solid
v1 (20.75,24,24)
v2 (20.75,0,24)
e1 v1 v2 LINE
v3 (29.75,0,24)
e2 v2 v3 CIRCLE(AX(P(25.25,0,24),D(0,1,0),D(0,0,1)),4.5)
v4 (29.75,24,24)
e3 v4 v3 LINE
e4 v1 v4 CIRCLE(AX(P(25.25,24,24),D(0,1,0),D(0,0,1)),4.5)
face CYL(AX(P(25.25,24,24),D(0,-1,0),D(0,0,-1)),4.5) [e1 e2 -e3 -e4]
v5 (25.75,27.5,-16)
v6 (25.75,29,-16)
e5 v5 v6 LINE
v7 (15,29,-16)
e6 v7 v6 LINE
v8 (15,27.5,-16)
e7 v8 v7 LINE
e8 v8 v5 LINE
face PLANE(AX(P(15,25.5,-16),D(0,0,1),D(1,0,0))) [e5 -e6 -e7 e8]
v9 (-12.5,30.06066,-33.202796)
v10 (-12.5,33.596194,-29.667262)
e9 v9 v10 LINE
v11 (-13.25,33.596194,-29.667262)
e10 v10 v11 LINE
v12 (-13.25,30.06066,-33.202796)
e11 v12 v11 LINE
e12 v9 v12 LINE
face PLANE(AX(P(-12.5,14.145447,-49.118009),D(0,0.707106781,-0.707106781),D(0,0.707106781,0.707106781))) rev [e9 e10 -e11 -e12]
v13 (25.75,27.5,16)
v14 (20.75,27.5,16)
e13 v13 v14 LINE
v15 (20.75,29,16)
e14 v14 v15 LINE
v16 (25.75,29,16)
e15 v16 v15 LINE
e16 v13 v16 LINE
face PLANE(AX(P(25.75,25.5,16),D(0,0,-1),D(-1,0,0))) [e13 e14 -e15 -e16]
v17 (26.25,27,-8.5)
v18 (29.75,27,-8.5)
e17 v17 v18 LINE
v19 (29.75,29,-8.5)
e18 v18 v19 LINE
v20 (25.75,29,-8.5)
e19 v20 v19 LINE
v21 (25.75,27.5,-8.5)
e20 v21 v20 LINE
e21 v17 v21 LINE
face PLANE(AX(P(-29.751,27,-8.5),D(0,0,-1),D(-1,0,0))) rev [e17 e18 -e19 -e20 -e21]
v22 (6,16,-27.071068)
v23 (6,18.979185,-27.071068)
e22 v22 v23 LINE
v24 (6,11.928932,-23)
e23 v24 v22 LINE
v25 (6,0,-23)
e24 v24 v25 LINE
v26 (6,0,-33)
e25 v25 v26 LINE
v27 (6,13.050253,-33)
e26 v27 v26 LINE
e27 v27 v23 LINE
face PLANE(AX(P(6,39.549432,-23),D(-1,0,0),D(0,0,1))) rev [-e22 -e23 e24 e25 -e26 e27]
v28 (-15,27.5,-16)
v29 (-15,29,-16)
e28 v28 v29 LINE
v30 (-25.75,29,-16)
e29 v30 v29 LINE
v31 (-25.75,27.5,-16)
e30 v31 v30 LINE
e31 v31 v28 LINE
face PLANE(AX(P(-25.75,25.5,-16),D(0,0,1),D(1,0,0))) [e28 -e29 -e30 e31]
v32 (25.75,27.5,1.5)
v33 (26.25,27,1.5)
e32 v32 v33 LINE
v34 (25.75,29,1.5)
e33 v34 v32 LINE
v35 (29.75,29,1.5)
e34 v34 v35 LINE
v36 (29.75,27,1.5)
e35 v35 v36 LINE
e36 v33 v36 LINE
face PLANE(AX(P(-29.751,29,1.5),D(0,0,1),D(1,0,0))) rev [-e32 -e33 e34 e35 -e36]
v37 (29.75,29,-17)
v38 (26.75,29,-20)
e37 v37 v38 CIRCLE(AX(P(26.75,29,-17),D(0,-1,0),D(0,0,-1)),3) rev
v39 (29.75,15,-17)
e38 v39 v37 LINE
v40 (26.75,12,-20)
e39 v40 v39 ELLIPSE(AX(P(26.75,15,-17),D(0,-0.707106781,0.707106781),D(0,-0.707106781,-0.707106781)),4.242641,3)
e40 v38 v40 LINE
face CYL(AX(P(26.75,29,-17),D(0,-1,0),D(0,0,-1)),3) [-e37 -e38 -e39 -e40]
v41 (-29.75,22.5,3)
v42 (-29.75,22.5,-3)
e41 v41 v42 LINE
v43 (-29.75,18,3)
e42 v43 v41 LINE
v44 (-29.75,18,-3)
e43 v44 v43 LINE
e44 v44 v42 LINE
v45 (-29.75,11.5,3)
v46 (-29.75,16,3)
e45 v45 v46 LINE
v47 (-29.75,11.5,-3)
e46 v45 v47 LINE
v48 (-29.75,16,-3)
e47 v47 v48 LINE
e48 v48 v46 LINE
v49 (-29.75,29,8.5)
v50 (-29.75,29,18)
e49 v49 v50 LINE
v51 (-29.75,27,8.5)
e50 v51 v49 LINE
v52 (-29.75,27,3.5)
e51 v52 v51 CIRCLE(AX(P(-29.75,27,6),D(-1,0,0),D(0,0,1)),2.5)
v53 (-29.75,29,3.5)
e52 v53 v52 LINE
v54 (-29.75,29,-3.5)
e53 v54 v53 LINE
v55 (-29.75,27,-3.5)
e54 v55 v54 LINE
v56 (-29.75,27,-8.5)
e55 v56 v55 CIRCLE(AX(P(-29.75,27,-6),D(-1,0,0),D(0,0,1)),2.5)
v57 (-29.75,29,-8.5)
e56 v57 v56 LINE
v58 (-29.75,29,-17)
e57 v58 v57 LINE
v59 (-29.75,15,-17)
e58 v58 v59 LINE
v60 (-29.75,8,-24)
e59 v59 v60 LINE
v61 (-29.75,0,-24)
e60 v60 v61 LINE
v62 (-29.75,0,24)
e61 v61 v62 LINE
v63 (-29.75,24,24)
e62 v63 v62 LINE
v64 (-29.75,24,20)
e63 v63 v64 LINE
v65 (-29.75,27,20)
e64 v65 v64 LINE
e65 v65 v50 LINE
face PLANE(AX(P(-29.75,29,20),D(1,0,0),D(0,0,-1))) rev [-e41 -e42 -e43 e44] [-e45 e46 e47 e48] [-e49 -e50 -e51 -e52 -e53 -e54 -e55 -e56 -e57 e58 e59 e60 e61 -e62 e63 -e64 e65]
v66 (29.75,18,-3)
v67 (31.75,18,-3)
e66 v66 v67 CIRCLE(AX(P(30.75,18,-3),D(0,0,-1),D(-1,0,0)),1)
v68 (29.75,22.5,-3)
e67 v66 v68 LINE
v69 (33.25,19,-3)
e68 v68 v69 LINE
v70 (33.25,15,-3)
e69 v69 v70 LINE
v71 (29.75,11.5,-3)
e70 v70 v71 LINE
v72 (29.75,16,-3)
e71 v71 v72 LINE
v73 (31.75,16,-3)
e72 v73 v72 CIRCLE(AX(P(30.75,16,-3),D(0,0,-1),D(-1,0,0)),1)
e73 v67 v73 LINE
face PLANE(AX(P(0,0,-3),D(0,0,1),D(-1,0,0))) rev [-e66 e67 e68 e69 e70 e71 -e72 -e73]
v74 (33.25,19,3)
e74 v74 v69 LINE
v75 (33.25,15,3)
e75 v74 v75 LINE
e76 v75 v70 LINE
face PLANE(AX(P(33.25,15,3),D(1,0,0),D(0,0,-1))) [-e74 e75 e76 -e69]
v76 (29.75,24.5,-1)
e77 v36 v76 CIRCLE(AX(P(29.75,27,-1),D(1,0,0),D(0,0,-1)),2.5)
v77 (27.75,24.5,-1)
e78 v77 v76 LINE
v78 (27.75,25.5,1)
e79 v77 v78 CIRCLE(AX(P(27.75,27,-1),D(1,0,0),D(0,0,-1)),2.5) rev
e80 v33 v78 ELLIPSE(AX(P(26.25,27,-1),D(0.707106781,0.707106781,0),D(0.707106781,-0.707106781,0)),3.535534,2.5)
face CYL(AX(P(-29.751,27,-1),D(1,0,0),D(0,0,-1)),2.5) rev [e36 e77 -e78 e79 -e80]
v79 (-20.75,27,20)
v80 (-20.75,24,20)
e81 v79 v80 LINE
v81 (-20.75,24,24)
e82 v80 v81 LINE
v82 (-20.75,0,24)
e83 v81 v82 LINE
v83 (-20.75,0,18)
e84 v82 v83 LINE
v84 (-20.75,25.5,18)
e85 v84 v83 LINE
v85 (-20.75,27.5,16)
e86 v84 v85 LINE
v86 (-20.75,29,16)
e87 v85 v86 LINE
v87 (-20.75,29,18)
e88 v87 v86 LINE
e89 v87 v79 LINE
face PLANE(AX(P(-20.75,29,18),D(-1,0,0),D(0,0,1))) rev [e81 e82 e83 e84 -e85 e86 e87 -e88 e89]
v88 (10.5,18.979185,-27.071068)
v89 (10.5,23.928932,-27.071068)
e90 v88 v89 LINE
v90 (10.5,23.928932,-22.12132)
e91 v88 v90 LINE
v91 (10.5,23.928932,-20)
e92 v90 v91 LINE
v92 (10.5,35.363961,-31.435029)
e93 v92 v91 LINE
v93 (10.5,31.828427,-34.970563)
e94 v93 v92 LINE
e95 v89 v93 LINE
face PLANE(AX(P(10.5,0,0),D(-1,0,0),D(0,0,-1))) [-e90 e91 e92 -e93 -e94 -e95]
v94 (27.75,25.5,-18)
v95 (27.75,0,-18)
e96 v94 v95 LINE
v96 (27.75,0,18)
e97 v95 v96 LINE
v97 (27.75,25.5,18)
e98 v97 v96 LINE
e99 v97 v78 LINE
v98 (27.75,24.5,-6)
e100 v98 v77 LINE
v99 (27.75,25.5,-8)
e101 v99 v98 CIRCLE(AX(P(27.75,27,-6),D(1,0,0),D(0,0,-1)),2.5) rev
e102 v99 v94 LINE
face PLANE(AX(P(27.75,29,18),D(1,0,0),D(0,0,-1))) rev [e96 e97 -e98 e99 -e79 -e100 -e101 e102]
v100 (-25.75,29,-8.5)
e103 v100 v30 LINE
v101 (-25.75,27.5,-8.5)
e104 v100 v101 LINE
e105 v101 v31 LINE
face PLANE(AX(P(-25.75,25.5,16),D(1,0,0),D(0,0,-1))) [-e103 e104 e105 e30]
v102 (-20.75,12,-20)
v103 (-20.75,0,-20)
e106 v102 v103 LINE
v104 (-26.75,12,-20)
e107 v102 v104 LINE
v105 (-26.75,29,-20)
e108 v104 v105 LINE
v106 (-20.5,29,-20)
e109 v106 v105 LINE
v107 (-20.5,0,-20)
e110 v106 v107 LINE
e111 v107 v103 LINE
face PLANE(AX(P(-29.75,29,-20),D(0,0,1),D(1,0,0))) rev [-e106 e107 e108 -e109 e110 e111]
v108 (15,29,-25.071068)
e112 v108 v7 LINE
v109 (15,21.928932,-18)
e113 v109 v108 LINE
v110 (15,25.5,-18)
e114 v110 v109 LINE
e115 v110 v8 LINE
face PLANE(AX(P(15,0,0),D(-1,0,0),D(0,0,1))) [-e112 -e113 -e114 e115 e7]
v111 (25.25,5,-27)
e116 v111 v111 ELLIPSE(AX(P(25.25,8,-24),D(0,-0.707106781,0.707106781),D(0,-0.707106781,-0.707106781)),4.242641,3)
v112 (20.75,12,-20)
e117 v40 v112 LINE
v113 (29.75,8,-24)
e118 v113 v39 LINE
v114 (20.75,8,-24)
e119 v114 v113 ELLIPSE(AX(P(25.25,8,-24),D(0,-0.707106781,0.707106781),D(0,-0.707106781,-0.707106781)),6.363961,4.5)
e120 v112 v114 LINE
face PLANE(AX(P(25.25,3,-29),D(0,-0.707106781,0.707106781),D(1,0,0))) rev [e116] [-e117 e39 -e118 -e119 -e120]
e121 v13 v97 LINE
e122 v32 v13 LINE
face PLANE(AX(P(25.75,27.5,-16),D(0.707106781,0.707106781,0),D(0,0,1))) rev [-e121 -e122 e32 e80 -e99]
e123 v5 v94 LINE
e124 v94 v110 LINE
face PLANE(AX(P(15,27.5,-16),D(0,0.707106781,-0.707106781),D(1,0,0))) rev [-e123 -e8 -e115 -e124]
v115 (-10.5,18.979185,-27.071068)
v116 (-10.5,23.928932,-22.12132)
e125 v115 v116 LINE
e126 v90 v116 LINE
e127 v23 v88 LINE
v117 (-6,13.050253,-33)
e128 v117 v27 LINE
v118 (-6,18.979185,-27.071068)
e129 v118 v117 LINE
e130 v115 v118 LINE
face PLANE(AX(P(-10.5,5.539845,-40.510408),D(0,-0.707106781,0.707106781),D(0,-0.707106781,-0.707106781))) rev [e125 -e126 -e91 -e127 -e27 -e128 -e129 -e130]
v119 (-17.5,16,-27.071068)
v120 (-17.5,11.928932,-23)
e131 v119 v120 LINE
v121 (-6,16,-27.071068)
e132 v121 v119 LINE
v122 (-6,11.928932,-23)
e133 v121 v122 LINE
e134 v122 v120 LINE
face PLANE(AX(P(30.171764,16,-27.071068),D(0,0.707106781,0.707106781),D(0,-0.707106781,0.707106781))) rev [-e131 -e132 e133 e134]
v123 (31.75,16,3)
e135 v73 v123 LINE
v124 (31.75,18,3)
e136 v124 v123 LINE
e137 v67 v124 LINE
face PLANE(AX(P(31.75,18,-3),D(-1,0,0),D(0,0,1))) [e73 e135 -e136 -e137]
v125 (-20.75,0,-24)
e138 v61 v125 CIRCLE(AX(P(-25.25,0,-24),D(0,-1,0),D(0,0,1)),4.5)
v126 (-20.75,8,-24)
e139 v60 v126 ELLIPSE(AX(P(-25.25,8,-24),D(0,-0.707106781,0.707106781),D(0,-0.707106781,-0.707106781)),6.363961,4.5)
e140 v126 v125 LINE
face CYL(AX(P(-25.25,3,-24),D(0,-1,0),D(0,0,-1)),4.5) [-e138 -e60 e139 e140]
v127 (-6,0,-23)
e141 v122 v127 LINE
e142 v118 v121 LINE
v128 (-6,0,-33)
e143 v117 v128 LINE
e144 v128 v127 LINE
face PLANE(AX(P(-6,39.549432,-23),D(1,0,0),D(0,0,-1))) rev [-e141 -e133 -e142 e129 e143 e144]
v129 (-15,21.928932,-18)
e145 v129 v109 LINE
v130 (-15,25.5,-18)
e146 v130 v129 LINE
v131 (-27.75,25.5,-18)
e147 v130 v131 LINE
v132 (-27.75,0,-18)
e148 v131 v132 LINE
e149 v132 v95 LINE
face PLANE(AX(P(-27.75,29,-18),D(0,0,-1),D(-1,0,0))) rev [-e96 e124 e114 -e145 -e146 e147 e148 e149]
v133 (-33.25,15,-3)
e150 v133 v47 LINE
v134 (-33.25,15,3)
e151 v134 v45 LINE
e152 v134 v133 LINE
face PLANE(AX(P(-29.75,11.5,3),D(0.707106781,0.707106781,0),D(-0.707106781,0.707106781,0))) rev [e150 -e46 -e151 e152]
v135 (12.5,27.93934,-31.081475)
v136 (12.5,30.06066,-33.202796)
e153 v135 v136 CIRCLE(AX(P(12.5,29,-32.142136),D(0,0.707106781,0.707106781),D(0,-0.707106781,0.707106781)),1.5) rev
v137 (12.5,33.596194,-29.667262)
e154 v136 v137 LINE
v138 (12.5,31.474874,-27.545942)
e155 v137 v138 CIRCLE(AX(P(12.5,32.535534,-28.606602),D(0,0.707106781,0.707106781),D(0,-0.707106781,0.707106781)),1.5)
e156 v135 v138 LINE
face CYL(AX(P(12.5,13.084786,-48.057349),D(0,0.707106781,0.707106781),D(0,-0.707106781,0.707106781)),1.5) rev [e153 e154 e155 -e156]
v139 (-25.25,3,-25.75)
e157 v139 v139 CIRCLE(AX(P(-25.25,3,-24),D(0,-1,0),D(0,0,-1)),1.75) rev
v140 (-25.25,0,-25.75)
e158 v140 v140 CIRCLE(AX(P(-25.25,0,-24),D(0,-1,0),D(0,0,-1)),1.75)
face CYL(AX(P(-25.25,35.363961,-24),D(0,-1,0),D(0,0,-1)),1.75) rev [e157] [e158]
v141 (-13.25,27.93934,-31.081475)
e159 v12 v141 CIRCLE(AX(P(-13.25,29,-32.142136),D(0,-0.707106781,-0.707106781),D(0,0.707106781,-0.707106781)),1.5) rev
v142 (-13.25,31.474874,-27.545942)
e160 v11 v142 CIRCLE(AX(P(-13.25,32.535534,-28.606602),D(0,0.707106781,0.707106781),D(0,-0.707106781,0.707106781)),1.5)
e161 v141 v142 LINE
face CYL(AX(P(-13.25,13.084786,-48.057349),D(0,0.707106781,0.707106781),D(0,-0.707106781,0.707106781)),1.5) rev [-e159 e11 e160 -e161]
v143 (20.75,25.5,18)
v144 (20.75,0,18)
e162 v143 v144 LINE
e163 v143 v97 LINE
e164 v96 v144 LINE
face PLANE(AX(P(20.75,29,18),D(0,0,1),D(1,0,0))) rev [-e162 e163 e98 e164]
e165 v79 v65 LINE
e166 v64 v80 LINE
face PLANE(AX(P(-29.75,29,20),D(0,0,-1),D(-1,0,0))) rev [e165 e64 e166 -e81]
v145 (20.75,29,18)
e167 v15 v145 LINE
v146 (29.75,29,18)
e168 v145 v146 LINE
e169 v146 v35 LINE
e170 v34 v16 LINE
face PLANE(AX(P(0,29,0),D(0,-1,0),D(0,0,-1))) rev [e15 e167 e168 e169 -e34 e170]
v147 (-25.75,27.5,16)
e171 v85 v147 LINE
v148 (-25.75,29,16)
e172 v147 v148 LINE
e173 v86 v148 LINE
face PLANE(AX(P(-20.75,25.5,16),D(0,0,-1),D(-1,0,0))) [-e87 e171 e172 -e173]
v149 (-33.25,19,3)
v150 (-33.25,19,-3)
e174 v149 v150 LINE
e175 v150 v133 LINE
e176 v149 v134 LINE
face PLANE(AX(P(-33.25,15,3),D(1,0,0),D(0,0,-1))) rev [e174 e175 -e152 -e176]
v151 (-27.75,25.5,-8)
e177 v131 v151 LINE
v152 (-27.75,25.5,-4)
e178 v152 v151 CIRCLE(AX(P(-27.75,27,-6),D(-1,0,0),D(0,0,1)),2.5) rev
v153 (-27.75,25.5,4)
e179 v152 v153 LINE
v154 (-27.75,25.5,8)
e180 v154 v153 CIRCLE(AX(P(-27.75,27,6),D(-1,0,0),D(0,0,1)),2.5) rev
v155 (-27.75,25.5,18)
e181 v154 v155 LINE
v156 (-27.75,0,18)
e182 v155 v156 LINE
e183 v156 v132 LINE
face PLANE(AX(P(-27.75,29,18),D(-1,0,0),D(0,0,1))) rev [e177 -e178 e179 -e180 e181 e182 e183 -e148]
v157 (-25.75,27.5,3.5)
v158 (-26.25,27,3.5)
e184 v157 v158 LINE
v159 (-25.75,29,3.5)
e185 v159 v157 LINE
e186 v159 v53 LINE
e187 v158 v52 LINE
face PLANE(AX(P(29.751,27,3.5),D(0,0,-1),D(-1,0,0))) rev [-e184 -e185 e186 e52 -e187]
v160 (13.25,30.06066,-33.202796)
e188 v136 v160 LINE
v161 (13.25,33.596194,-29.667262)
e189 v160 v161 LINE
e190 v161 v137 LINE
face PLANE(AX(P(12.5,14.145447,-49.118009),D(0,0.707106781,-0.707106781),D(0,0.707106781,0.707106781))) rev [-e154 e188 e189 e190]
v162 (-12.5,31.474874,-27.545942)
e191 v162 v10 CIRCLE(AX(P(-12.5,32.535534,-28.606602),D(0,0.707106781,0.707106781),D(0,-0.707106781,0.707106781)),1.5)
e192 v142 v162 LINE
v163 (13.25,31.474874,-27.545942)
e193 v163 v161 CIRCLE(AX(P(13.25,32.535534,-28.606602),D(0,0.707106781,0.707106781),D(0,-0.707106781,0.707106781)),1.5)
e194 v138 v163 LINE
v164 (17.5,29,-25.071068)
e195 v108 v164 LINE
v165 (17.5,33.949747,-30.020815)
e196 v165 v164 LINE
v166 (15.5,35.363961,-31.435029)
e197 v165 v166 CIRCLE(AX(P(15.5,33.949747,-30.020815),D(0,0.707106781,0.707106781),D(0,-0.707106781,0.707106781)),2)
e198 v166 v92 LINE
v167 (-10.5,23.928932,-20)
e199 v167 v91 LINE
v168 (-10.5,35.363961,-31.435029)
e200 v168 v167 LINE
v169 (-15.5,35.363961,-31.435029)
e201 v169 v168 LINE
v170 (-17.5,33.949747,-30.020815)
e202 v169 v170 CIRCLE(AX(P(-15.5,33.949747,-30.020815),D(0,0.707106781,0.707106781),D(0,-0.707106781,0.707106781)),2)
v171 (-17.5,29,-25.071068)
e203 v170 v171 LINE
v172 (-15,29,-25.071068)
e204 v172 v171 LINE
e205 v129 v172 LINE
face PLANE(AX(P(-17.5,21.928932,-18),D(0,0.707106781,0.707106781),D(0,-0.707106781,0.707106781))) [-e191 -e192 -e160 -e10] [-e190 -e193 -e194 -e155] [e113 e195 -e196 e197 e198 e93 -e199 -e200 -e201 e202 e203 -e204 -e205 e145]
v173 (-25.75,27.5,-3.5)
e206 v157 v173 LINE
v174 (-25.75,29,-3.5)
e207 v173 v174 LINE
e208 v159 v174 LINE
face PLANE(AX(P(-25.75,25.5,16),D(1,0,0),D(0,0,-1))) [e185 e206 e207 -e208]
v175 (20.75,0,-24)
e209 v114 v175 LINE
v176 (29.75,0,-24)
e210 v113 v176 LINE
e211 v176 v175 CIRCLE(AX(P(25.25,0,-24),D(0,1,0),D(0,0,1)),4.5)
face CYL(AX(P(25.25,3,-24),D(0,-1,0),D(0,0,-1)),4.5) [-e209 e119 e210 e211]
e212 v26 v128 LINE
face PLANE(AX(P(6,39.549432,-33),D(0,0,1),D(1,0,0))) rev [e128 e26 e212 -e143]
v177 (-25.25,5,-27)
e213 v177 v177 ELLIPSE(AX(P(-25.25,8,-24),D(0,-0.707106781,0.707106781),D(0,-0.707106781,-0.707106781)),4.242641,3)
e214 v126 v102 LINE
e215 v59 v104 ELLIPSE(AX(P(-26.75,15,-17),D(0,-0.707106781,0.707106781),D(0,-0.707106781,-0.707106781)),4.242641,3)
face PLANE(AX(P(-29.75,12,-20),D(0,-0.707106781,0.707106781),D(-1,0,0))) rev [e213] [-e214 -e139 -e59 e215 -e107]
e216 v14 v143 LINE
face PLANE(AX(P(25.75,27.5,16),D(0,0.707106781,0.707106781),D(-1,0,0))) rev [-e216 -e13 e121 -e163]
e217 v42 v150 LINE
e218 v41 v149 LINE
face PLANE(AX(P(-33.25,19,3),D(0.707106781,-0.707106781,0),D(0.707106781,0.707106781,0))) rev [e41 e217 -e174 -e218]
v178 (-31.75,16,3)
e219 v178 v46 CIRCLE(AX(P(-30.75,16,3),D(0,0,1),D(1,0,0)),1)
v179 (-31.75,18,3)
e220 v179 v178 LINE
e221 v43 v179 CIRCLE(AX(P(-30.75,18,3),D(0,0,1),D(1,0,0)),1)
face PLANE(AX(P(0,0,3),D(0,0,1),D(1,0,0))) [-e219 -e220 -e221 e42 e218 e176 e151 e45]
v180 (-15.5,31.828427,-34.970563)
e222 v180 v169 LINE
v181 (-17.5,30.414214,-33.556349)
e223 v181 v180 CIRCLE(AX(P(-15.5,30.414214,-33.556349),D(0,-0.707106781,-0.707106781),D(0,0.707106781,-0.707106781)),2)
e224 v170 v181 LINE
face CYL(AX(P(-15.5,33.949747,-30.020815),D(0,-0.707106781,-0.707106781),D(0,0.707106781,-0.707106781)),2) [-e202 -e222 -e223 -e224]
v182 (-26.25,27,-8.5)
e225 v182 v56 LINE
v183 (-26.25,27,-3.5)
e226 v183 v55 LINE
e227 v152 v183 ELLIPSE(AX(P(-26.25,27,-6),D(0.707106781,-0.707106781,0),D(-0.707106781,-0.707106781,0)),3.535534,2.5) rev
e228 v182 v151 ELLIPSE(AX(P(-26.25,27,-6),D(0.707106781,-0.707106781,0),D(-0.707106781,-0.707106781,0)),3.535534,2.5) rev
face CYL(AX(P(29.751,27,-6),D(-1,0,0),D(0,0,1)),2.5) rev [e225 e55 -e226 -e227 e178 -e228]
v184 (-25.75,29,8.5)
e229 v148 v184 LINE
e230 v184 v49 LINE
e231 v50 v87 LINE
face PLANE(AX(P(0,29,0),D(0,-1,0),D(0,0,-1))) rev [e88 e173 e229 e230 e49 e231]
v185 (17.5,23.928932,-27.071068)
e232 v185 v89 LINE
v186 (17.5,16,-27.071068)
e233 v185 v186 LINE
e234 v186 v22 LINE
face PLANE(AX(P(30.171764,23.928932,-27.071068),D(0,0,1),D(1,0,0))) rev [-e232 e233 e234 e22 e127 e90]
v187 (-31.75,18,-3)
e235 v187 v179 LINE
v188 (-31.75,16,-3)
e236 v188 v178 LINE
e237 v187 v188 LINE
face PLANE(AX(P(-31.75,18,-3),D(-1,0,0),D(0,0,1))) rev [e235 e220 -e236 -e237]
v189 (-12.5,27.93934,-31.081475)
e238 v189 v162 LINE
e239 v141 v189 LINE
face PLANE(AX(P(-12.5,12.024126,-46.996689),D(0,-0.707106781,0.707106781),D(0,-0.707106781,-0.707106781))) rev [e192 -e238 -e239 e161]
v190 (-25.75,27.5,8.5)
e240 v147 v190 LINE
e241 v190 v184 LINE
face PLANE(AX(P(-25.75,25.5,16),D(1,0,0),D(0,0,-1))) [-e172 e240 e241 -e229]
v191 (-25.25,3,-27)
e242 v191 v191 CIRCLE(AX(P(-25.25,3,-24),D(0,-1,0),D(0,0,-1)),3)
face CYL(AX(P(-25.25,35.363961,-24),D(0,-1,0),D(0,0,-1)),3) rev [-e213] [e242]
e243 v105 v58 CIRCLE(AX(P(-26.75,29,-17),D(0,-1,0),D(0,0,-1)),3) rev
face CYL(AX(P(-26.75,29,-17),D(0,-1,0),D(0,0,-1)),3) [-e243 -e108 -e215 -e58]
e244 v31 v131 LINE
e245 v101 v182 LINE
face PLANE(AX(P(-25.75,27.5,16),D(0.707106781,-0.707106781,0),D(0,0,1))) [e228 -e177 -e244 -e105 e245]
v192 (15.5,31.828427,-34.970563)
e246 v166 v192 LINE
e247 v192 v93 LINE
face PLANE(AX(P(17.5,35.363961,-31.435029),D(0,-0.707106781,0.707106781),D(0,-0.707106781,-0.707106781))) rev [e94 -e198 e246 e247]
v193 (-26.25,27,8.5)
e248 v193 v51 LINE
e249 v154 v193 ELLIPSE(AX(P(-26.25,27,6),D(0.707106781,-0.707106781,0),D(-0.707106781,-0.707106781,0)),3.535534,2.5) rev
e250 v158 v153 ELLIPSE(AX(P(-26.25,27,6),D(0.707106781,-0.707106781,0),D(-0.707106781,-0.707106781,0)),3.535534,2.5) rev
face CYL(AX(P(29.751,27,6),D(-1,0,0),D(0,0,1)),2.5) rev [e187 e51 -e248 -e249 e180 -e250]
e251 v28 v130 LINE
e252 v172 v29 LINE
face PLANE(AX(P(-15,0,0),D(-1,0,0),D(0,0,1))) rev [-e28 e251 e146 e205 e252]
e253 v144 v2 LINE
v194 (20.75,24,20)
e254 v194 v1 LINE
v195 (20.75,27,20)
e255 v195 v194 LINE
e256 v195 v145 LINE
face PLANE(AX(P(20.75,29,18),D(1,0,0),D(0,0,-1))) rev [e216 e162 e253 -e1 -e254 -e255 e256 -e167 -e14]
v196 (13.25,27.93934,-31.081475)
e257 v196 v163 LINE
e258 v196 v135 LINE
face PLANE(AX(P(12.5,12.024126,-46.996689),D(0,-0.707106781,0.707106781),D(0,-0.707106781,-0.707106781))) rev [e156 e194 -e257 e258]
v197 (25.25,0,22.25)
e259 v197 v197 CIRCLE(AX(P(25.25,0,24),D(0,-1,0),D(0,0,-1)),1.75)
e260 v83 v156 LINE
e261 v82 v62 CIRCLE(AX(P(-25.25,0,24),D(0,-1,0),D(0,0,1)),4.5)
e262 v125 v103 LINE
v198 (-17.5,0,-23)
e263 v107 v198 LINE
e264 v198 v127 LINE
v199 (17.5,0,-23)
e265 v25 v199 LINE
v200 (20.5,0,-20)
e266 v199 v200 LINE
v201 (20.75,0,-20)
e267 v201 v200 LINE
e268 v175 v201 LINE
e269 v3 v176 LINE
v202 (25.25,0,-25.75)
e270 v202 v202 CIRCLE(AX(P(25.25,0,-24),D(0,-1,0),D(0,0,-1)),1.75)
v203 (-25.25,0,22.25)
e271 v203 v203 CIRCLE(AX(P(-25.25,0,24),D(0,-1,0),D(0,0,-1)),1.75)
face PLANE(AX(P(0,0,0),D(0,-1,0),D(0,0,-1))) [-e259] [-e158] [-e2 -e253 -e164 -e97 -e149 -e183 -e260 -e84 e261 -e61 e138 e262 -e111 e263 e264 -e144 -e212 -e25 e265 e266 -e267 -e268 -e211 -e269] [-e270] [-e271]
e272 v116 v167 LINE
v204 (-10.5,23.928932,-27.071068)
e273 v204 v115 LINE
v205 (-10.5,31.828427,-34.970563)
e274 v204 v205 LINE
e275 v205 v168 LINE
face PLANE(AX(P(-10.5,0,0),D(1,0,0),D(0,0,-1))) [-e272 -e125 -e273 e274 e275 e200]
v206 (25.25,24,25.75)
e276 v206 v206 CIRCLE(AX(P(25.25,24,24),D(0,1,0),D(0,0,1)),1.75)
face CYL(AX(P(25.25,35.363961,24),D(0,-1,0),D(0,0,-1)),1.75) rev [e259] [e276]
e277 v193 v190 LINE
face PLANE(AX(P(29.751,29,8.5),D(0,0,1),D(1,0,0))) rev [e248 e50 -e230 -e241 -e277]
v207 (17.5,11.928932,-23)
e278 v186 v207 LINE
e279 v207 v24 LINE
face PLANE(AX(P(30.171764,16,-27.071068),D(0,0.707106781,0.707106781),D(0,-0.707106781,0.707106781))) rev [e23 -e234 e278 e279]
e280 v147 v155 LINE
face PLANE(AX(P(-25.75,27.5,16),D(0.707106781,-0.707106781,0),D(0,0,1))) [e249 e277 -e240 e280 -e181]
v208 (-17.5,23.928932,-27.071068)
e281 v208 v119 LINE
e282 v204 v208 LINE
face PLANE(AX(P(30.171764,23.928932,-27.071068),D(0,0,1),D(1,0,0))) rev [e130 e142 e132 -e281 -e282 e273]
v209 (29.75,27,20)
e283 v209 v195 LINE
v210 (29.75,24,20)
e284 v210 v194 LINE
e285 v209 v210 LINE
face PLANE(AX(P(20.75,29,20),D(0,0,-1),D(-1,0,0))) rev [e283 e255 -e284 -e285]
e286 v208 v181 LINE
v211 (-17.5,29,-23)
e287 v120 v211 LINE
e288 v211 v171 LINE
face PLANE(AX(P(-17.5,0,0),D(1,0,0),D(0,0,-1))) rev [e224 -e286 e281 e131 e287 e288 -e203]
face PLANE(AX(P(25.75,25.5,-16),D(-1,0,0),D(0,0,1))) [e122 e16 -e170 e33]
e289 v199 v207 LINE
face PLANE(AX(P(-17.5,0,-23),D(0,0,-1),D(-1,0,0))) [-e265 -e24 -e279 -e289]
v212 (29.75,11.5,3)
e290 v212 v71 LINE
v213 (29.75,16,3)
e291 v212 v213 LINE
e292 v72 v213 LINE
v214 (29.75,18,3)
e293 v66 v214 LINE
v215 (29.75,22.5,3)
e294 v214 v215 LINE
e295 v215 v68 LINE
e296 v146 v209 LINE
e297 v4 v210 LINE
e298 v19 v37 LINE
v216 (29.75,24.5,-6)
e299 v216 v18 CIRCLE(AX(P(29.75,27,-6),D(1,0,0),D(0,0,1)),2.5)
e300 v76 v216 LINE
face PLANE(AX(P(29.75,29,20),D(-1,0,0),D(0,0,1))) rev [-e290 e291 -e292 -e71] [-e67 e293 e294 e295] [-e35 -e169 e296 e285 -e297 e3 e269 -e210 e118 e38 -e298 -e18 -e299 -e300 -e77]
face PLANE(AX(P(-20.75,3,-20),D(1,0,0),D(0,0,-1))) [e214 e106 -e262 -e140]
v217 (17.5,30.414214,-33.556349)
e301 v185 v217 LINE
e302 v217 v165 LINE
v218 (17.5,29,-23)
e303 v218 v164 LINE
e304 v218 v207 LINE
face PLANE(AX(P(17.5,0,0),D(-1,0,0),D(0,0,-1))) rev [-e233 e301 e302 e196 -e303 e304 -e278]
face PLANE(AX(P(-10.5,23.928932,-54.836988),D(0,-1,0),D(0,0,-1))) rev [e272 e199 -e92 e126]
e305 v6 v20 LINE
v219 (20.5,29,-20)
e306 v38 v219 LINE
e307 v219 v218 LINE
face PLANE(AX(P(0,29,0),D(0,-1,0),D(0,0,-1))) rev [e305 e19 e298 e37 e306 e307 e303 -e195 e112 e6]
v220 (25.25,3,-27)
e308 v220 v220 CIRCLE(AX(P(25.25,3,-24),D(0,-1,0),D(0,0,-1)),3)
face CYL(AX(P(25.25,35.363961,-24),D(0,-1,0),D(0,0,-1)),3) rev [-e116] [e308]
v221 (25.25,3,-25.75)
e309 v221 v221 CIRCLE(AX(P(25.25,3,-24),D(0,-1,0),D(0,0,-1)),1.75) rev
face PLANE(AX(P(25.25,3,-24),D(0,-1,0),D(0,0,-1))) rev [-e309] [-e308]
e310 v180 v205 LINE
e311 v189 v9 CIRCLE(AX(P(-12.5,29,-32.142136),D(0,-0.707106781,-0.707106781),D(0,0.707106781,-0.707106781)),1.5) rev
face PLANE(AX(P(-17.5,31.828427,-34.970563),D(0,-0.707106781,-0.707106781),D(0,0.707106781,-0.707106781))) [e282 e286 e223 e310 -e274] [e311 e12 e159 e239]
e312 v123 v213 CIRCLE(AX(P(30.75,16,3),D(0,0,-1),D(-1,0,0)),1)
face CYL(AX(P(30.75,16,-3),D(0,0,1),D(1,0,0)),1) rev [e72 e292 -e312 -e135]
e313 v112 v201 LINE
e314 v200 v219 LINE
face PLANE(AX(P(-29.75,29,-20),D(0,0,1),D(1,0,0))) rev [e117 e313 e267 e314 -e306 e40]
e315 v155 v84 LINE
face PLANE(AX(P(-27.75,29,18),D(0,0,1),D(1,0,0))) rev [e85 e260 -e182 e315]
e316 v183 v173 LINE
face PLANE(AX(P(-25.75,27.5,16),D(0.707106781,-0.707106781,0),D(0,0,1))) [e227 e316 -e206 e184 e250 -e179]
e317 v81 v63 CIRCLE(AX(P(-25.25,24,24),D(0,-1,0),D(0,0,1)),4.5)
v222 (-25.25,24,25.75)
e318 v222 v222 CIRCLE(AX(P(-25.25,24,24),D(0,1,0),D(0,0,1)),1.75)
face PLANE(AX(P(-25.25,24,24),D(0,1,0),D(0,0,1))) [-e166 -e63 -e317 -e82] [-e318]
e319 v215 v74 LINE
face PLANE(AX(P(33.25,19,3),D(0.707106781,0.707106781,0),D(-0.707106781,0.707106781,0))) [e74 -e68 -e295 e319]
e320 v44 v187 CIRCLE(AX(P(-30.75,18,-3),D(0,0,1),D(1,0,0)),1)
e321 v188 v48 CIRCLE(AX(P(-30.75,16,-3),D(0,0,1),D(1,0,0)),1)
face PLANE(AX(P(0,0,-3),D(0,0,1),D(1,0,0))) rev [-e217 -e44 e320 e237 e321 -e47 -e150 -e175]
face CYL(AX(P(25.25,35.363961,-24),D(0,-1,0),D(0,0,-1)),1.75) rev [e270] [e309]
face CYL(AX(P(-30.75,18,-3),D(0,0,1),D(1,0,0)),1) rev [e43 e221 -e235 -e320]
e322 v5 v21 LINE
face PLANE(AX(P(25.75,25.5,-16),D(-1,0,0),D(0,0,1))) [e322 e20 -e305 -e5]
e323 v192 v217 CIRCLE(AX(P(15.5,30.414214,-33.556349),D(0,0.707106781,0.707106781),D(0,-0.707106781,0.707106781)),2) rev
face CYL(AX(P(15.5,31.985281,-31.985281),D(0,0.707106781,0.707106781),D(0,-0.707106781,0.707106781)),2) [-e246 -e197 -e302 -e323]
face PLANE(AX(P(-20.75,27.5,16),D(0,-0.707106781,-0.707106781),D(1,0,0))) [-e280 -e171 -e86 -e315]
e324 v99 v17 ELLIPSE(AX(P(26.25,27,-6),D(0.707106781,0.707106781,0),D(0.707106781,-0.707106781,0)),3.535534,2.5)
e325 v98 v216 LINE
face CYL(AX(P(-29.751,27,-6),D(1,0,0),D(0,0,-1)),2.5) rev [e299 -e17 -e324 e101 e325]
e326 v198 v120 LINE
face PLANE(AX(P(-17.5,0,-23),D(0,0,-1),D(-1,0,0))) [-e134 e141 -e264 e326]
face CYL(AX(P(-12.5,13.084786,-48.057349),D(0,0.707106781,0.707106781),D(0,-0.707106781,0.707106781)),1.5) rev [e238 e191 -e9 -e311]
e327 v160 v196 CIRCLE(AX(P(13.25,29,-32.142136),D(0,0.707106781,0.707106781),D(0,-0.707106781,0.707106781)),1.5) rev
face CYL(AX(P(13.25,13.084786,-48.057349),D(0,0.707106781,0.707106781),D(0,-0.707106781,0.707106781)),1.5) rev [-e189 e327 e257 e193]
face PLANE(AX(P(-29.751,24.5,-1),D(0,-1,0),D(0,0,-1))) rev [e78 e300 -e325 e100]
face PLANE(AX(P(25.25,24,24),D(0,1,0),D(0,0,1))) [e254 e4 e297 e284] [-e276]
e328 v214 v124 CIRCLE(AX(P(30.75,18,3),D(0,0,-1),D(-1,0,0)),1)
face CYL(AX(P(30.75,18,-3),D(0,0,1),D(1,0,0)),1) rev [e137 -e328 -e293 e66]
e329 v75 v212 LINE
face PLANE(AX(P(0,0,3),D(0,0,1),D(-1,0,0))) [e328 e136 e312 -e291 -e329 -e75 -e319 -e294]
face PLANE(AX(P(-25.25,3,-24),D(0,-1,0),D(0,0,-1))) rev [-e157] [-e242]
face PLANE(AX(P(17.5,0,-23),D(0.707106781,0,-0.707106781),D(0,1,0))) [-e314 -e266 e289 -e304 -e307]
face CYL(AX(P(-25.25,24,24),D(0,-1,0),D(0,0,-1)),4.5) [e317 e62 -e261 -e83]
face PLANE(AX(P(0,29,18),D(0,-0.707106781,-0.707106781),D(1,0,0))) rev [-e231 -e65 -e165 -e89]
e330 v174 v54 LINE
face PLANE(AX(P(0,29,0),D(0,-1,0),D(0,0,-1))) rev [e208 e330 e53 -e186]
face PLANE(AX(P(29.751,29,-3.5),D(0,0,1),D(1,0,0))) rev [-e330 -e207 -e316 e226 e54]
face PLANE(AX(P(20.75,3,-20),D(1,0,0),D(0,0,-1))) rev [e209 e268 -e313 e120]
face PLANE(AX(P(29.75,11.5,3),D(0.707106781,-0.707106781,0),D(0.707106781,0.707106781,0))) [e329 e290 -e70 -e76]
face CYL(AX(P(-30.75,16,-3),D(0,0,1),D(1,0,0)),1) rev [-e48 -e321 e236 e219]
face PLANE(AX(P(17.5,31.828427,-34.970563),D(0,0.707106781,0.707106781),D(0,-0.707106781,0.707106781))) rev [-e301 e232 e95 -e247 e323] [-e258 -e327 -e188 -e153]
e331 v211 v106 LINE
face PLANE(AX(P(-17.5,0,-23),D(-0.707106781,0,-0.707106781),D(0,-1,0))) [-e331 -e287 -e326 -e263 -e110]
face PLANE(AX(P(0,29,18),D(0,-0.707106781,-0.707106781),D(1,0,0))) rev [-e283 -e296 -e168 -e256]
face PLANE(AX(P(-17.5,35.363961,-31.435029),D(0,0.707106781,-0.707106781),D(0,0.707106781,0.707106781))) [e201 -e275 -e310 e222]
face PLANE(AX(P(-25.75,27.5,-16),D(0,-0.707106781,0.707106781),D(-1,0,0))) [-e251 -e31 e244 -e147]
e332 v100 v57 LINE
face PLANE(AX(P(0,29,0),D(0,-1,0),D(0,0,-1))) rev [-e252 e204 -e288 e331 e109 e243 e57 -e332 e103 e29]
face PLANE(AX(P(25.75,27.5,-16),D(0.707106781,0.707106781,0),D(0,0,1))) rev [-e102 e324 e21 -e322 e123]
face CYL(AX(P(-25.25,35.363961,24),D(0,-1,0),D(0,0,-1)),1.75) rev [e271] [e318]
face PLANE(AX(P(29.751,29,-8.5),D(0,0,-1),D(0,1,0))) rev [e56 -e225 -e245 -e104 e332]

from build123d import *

# Parameters (mm, degrees)
BOSS_EXTRUDE1_DEPTH              = 29
BOSS_EXTRUDE2_START              = -10.5
BOSS_EXTRUDE2_DEPTH              = 7
CUT_EXTRUDE1_DEPTH               = 15
CUT_EXTRUDE2_REACH               = 60.007
BOSS_EXTRUDE4_DEPTH              = 2.5
SKETCH6_W                        = 21
SKETCH6_H                        = 23.928932188
BOSS_EXTRUDE3_DEPTH              = 3
CHAMFER1_SIZE                    = 3
FILLET3_R                        = 2
BOSS_EXTRUDE5_DEPTH              = 3
BOSS_EXTRUDE6_DEPTH              = 24
CHAMFER4_START                   = 3
CHAMFER4_DEPTH                   = 0.53256
CHAMFER4_START_2                 = 3.53256
CHAMFER4_2_DEPTH                 = 8.46744
CHAMFER4_START_3                 = 22.627416998
CHAMFER4_3_DEPTH                 = 7.372583002
SKETCH9_R                        = 1.75
CUT_EXTRUDE4_DEPTH               = 58.953537465
CUT_EXTRUDE5_START               = -3
SKETCH10_R                       = 3
CUT_EXTRUDE5_DEPTH               = 55.953537465
BOSS_EXTRUDE7_DEPTH              = 3.5
CHAMFER5_SIZE                    = 2
FILLET4_R                        = 3
CUT_EXTRUDE6_REACH               = 79.549
CUT_EXTRUDE7_REACH               = 79.549
BOSS_EXTRUDE8_DEPTH              = 3
CUT_EXTRUDE8_DEPTH               = 3
SKETCH17_W                       = 12
SKETCH17_H                       = 10
BOSS_EXTRUDE9_DEPTH              = 23.928932188
BOSS_EXTRUDE10_REACH             = 61.826
BOSS_EXTRUDE10_DIRECTION_2_REACH = 61.826
SKETCH19_W                       = 21
SKETCH19_H                       = 14.671572875
CUT_EXTRUDE9_DEPTH               = 60.877250418
CHAMFER6_SIZE                    = 2


with BuildPart() as part:
    # Sketch1 → Boss-Extrude1 (new body)
    with BuildSketch(Plane(origin=(0, 0, 0), x_dir=(1, 0, 0), z_dir=(0, 1, 0))):
        Polygon((-29.75, 20), (29.75, 20), (29.75, -20), (20.75, -20), (20.75, -18), (27.75, -18), (27.75, 18), (-27.75, 18), (-27.75, -18), (-20.75, -18), (-20.75, -20), (-29.75, -20), align=None)
    extrude(amount=BOSS_EXTRUDE1_DEPTH)

    # Sketch2 → Boss-Extrude2 (add)
    with BuildSketch(Plane(origin=(0, 0, 0), x_dir=(0, 0, -1), z_dir=(1, 0, 0)).offset(BOSS_EXTRUDE2_START)):
        Polygon((18, 0), (18, 21.928932188), (31.435028843, 35.363961031), (34.970562748, 31.828427125), (23, 19.857864376), (23, 0), align=None)
    boss_extrude2 = extrude(amount=-BOSS_EXTRUDE2_DEPTH)

    # Mirror1: Boss-Extrude2 across plane
    add(boss_extrude2.mirror(Plane(origin=(0, 0, 0), x_dir=(0, 0, 1), z_dir=(1, 0, 0))))

    # Sketch3 → Cut-Extrude1 (cut, symmetric)
    with BuildSketch(Plane(origin=(0, 0, 0), x_dir=(0, 0, -1), z_dir=(1, 0, 0))):
        Polygon((18, 21.928932188), (18, 29), (25.071067812, 29), align=None)
    extrude(amount=CUT_EXTRUDE1_DEPTH, both=True, mode=Mode.SUBTRACT)

    # Sketch4 → Cut-Extrude2 (cut, up to next)
    with BuildSketch(Plane(origin=(0, 1.964466094, 1.964466094), x_dir=(1, 0, 0), z_dir=(0, 0.7071067811865483, 0.7071067811865468)), mode=Mode.PRIVATE) as cut_extrude2_sk1:
        with BuildLine():
            Line((-12.5, 41.734018716), (-13.25, 41.734018716))
            ThreePointArc((-13.25, 41.734018716), (-14.75, 43.234018716), (-13.25, 44.734018716))
            Line((-13.25, 44.734018716), (-12.5, 44.734018716))
            ThreePointArc((-12.5, 44.734018716), (-11, 43.234018716), (-12.5, 41.734018716))
        make_face()
    cut_extrude2_tool1 = extrude(cut_extrude2_sk1.sketch, amount=-CUT_EXTRUDE2_REACH, mode=Mode.PRIVATE) & part.part
    # Sketch4 → Cut-Extrude2 (cut, up to next)
    with BuildSketch(Plane(origin=(0, 1.964466094, 1.964466094), x_dir=(1, 0, 0), z_dir=(0, 0.7071067811865483, 0.7071067811865468)), mode=Mode.PRIVATE) as cut_extrude2_sk2:
        with BuildLine():
            Line((12.5, 44.734018716), (13.25, 44.734018716))
            ThreePointArc((13.25, 44.734018716), (14.75, 43.234018716), (13.25, 41.734018716))
            Line((13.25, 41.734018716), (12.5, 41.734018716))
            ThreePointArc((12.5, 41.734018716), (11, 43.234018716), (12.5, 44.734018716))
        make_face()
    cut_extrude2_tool2 = extrude(cut_extrude2_sk2.sketch, amount=-CUT_EXTRUDE2_REACH, mode=Mode.PRIVATE) & part.part
    add(cut_extrude2_tool1.solids().sort_by_distance((-12.875, 32.535534, -28.606602))[0], mode=Mode.SUBTRACT)
    add(cut_extrude2_tool2.solids().sort_by_distance((12.875, 32.535534, -28.606602))[0], mode=Mode.SUBTRACT)

    # Sketch7 → Boss-Extrude4 (add)
    with BuildSketch(Plane.ZY.offset(17.5)):
        Polygon((-25.071067812, 29), (-20, 29), (-20, 23.928932188), align=None)
    boss_extrude4 = extrude(amount=-BOSS_EXTRUDE4_DEPTH)

    # Mirror2: Boss-Extrude4 across plane
    add(boss_extrude4.mirror(Plane(origin=(0, 0, 0), x_dir=(0, 0, 1), z_dir=(1, 0, 0))))

    # Sketch6 → Boss-Extrude3 (add)
    with BuildSketch(Plane(origin=(0, 0, -20), x_dir=(-1, 0, 0), z_dir=(0, 0, -1))):
        with Locations((0, 11.964466094)):
            Rectangle(SKETCH6_W, SKETCH6_H)
    extrude(amount=BOSS_EXTRUDE3_DEPTH)

    # Chamfer1
    chamfer1_edges = [part.edges().sort_by_distance(p)[0] for p in [
        (-17.5, 14.5, -20),
        (17.5, 14.5, -20),
    ]]
    chamfer(chamfer1_edges, length=CHAMFER1_SIZE - 0.0001)  # a hair under: the kernel refuses the full size

    # Fillet3
    fillet3_edges = [part.edges().sort_by_distance(p)[0] for p in [
        (-17.5, 33.596194078, -33.202795796),
        (17.5, 33.596194078, -33.202795796),
    ]]
    fillet(fillet3_edges, radius=FILLET3_R)

    # Sketch8 → Boss-Extrude5 (add)
    with BuildSketch(Plane.XZ):
        with BuildLine():
            Line((-29.75, -20), (-20.75, -20))
            Line((-20.75, -20), (-20.75, -24))
            ThreePointArc((-20.75, -24), (-25.25, -28.5), (-29.75, -24))
            Line((-29.75, -24), (-29.75, -20))
        make_face()
    boss_extrude5 = extrude(amount=-BOSS_EXTRUDE5_DEPTH)

    # Mirror5: Boss-Extrude5 across plane
    add(boss_extrude5.mirror(Plane(origin=(0, 0, 0), x_dir=(0, 0, 1), z_dir=(1, 0, 0))))

    # Sketch11 → Boss-Extrude6 (add)
    with BuildSketch(Plane.XZ):
        with BuildLine():
            Line((-20.75, 20), (-29.75, 20))
            Line((-29.75, 20), (-29.75, 24))
            ThreePointArc((-29.75, 24), (-25.25, 28.5), (-20.75, 24))
            Line((-20.75, 24), (-20.75, 20))
        make_face()
    boss_extrude6 = extrude(amount=-BOSS_EXTRUDE6_DEPTH)

    # Mirror6: Boss-Extrude6 across plane
    add(boss_extrude6.mirror(Plane(origin=(0, 0, 0), x_dir=(0, 0, 1), z_dir=(1, 0, 0))))

    # Chamfer4: read off the stored shape, not the designer's step
    # Chamfer4 outline → Chamfer4 (add)
    with BuildSketch(Plane(origin=(0, 0, 0), x_dir=(1, 0, 0), z_dir=(0, 1, 0)).offset(CHAMFER4_START)):
        with BuildLine():
            Line((20.75, 24), (20.75, 20))
            Line((20.75, 20), (29.75, 20))
            Line((29.75, 20), (29.75, 24))
            ThreePointArc((29.75, 24), (25.25, 28.5), (20.75, 24))
        make_face()
        with BuildLine():
            Line((-29.75, 20), (-20.75, 20))
            Line((-20.75, 20), (-20.75, 24))
            ThreePointArc((-20.75, 24), (-25.25, 28.5), (-29.75, 24))
            Line((-29.75, 24), (-29.75, 20))
        make_face()
    extrude(amount=CHAMFER4_DEPTH)

    # Chamfer4 2 outline → Chamfer4 2 (add)
    with BuildSketch(Plane(origin=(0, 0, 0), x_dir=(1, 0, 0), z_dir=(0, 1, 0)).offset(CHAMFER4_START_2)):
        with BuildLine():
            Line((20.75, 24), (20.75, 20))
            Line((20.75, 20), (29.75, 20))
            Line((29.75, 20), (29.75, 24))
            ThreePointArc((29.75, 24), (25.25, 28.5), (20.75, 24))
        make_face()
        with BuildLine():
            Line((-29.75, 20), (-20.75, 20))
            Line((-20.75, 20), (-20.75, 24))
            ThreePointArc((-20.75, 24), (-25.25, 28.5), (-29.75, 24))
            Line((-29.75, 24), (-29.75, 20))
        make_face()
    extrude(amount=CHAMFER4_2_DEPTH)

    # Chamfer4 3 outline → Chamfer4 3 (cut)
    with BuildSketch(Plane(origin=(0, 0, 0), x_dir=(1, 0, 0), z_dir=(0, 0.707106781186544, -0.707106781186551)).offset(CHAMFER4_START_3)):
        with BuildLine():
            add(Edge.make_bspline(
                [(20.75, 11.313708499), (20.75, 17.67766953), (25.25, 17.67766953), (29.75, 17.67766953), (29.75, 11.313708499)],
                knots=[4.71238898, 4.71238898, 4.71238898, 6.283185307, 6.283185307, 7.853981634, 7.853981634, 7.853981634], degree=2, weights=[1, 0.707106781, 1, 0.707106781, 1]))
            Line((20.75, 11.313708499), (20.75, 5.656854249))
            Line((20.75, 5.656854249), (29.75, 5.656854249))
            Line((29.75, 5.656854249), (29.75, 11.313708499))
        make_face()
        with BuildLine():
            add(Edge.make_bspline(
                [(-29.75, 11.313708499), (-29.75, 17.67766953), (-25.25, 17.67766953), (-20.75, 17.67766953), (-20.75, 11.313708499)],
                knots=[4.71238898, 4.71238898, 4.71238898, 6.283185307, 6.283185307, 7.853981634, 7.853981634, 7.853981634], degree=2, weights=[1, 0.707106781, 1, 0.707106781, 1]))
            Line((-29.75, 11.313708499), (-29.75, 5.656854249))
            Line((-29.75, 5.656854249), (-20.75, 5.656854249))
            Line((-20.75, 5.656854249), (-20.75, 11.313708499))
        make_face()
    extrude(amount=CHAMFER4_3_DEPTH, mode=Mode.SUBTRACT)

    # Sketch9 → Cut-Extrude4 (cut, through all)
    with BuildSketch(Plane.XZ):
        with Locations(Location((-25.25, -24, 0), (0, 0, 270))):
            Circle(SKETCH9_R)
        with Locations(Location((25.25, -24, 0), (0, 0, 270))):
            Circle(SKETCH9_R)
        with Locations(Location((25.25, 24, 0), (0, 0, 270))):
            Circle(SKETCH9_R)
        with Locations(Location((-25.25, 24, 0), (0, 0, 270))):
            Circle(SKETCH9_R)
    extrude(amount=-CUT_EXTRUDE4_DEPTH, mode=Mode.SUBTRACT)

    # Sketch10 → Cut-Extrude5 (cut, through all)
    with BuildSketch(Plane.XZ.offset(CUT_EXTRUDE5_START)):
        with Locations(Location((-25.25, -24, 0), (0, 0, 270))):
            Circle(SKETCH10_R)
        with Locations(Location((25.25, -24, 0), (0, 0, 270))):
            Circle(SKETCH10_R)
    extrude(amount=-CUT_EXTRUDE5_DEPTH, mode=Mode.SUBTRACT)

    # Sketch12 → Boss-Extrude7 (add)
    with BuildSketch(Plane(origin=(0, 29, 0), x_dir=(1, 0, 0), z_dir=(0, 1, 0))):
        Polygon((-20.75, -18), (-27.75, -18), (-27.75, 18), (-15, 18), (-15, 16), (-25.75, 16), (-25.75, -16), (-20.75, -16), align=None)
        Polygon((15, 18), (27.75, 18), (27.75, -18), (20.75, -18), (20.75, -16), (25.75, -16), (25.75, 16), (15, 16), align=None)
    extrude(amount=-BOSS_EXTRUDE7_DEPTH)

    # Chamfer5
    chamfer5_edges = [part.edges().sort_by_distance(p)[0] for p in [
        (23.25, 25.5, 16),
        (25.75, 25.5, 0),
        (20.375, 25.5, -16),
        (-20.375, 25.5, -16),
        (-25.75, 25.5, 0),
        (-23.25, 25.5, 16),
    ]]
    chamfer(chamfer5_edges, length=CHAMFER5_SIZE - 0.0001)  # a hair under: the kernel refuses the full size

    # Fillet4
    fillet4_edges = [part.edges().sort_by_distance(p)[0] for p in [
        (-29.75, 20.5, -20),
        (29.75, 20.5, -20),
    ]]
    fillet(fillet4_edges, radius=FILLET4_R)

    # Sketch13 → Cut-Extrude6 (cut, up to next)
    with BuildSketch(Plane.ZY.offset(29.75), mode=Mode.PRIVATE) as cut_extrude6_sk1:
        with BuildLine():
            Line((-8.5, 29), (-3.5, 29))
            Line((-3.5, 29), (-3.5, 27))
            ThreePointArc((-3.5, 27), (-6, 24.5), (-8.5, 27))
            Line((-8.5, 27), (-8.5, 29))
        make_face()
    cut_extrude6_tool1 = extrude(cut_extrude6_sk1.sketch, amount=-CUT_EXTRUDE6_REACH, mode=Mode.PRIVATE) & part.part
    # Sketch13 → Cut-Extrude6 (cut, up to next)
    with BuildSketch(Plane.ZY.offset(29.75), mode=Mode.PRIVATE) as cut_extrude6_sk2:
        with BuildLine():
            Line((3.5, 27), (3.5, 29))
            Line((3.5, 29), (8.5, 29))
            Line((8.5, 29), (8.5, 27))
            ThreePointArc((8.5, 27), (6, 24.5), (3.5, 27))
        make_face()
    cut_extrude6_tool2 = extrude(cut_extrude6_sk2.sketch, amount=-CUT_EXTRUDE6_REACH, mode=Mode.PRIVATE) & part.part
    add(cut_extrude6_tool1.solids().sort_by_distance((-29.75, 26.978975, -6))[0], mode=Mode.SUBTRACT)
    add(cut_extrude6_tool2.solids().sort_by_distance((-29.75, 26.978975, 6))[0], mode=Mode.SUBTRACT)

    # Sketch14 → Cut-Extrude7 (cut, up to next)
    with BuildSketch(Plane(origin=(29.75, 0, 0), x_dir=(0, 0, -1), z_dir=(1, 0, 0)), mode=Mode.PRIVATE) as cut_extrude7_sk1:
        with BuildLine():
            Line((8.5, 27), (8.5, 29))
            Line((8.5, 29), (-1.5, 29))
            Line((-1.5, 29), (-1.5, 27))
            ThreePointArc((-1.5, 27), (-0.767766953, 25.232233047), (1, 24.5))
            Line((1, 24.5), (6, 24.5))
            ThreePointArc((6, 24.5), (7.767766953, 25.232233047), (8.5, 27))
        make_face()
    cut_extrude7_tool1 = extrude(cut_extrude7_sk1.sketch, amount=-CUT_EXTRUDE7_REACH, mode=Mode.PRIVATE) & part.part
    add(cut_extrude7_tool1.solids().sort_by_distance((29.75, 26.85723, -3.5))[0], mode=Mode.SUBTRACT)

    # Sketch15 → Boss-Extrude8 (add, symmetric)
    with BuildSketch(Plane.XY):
        Polygon((-29.75, 22.5), (-29.75, 11.5), (-33.25, 15), (-33.25, 19), align=None)
    boss_extrude8 = extrude(amount=BOSS_EXTRUDE8_DEPTH, both=True)

    # Sketch16 → Cut-Extrude8 (cut, symmetric)
    with BuildSketch(Plane.XY):
        with BuildLine():
            Line((-29.75, 18), (-29.75, 16))
            ThreePointArc((-29.75, 16), (-30.75, 15), (-31.75, 16))
            Line((-31.75, 16), (-31.75, 18))
            ThreePointArc((-31.75, 18), (-30.75, 19), (-29.75, 18))
        make_face()
    cut_extrude8 = extrude(amount=CUT_EXTRUDE8_DEPTH, both=True, mode=Mode.SUBTRACT)

    # Mirror7: Boss-Extrude8, Cut-Extrude8 across plane
    add(boss_extrude8.mirror(Plane(origin=(0, 0, 0), x_dir=(0, 0, 1), z_dir=(1, 0, 0))))
    add(cut_extrude8.mirror(Plane(origin=(0, 0, 0), x_dir=(0, 0, 1), z_dir=(1, 0, 0))), mode=Mode.SUBTRACT)

    # Sketch17 → Boss-Extrude9 (add)
    with BuildSketch(Plane(origin=(0, 0, 0), x_dir=(1, 0, 0), z_dir=(0, 1, 0))):
        with Locations((0, 28)):
            Rectangle(SKETCH17_W, SKETCH17_H)
    extrude(amount=BOSS_EXTRUDE9_DEPTH)

    # Boss-Extrude10: up to this face of the body (flat: up to its plane)
    boss_extrude10_end = Plane(part.part.faces().sort_by_distance((17.5, 27.632652573, -27.327819921))[0])
    # Sketch18 → Boss-Extrude10 (add, up to the picked face)
    with BuildSketch(Plane(origin=(0, 0, 0), x_dir=(0, 0, -1), z_dir=(1, 0, 0)), mode=Mode.PRIVATE) as boss_extrude10_sk1:
        Polygon((23, 11.928932188), (23, 23.928932188), (27.071067812, 23.928932188), (27.071067812, 16), align=None)
    boss_extrude10_tool1 = split(extrude(boss_extrude10_sk1.sketch, amount=BOSS_EXTRUDE10_REACH, mode=Mode.PRIVATE), bisect_by=boss_extrude10_end, keep=Keep.BOTH, mode=Mode.PRIVATE)
    add(boss_extrude10_tool1.solids().sort_by(Axis((0, 18.877396, -24.896928), (1, 0, 0)))[0])

    # Boss-Extrude10 direction 2: up to this face of the body (flat: up to its plane)
    boss_extrude10_direction_2_end = Plane(part.part.faces().sort_by_distance((-17.5, 27.632652573, -27.327819921))[0])
    # Sketch18 → Boss-Extrude10 direction 2 (add, up to the picked face)
    with BuildSketch(Plane(origin=(0, 0, 0), x_dir=(0, 0, -1), z_dir=(1, 0, 0)), mode=Mode.PRIVATE) as boss_extrude10_direction_2_sk1:
        Polygon((23, 11.928932188), (23, 23.928932188), (27.071067812, 23.928932188), (27.071067812, 16), align=None)
    boss_extrude10_direction_2_tool1 = split(extrude(boss_extrude10_direction_2_sk1.sketch, amount=-BOSS_EXTRUDE10_DIRECTION_2_REACH, mode=Mode.PRIVATE), bisect_by=boss_extrude10_direction_2_end, keep=Keep.BOTH, mode=Mode.PRIVATE)
    add(boss_extrude10_direction_2_tool1.solids().sort_by(Axis((0, 18.877396, -24.896928), (-1, 0, 0)))[0])

    # Sketch19 → Cut-Extrude9 (cut, through all)
    with BuildSketch(Plane(origin=(0, 1.964466094, 1.964466094), x_dir=(1, 0, 0), z_dir=(0, 0.7071067811865487, 0.7071067811865465))):
        with Locations((0, 39.898232279)):
            Rectangle(SKETCH19_W, SKETCH19_H)
    extrude(amount=-CUT_EXTRUDE9_DEPTH, mode=Mode.SUBTRACT)

    # Chamfer6
    chamfer6_edges = [part.edges().sort_by_distance(p)[0] for p in [
        (25.25, 29, 20),
        (-25.25, 29, 20),
    ]]
    chamfer(chamfer6_edges, length=CHAMFER6_SIZE)


solid = part.part
